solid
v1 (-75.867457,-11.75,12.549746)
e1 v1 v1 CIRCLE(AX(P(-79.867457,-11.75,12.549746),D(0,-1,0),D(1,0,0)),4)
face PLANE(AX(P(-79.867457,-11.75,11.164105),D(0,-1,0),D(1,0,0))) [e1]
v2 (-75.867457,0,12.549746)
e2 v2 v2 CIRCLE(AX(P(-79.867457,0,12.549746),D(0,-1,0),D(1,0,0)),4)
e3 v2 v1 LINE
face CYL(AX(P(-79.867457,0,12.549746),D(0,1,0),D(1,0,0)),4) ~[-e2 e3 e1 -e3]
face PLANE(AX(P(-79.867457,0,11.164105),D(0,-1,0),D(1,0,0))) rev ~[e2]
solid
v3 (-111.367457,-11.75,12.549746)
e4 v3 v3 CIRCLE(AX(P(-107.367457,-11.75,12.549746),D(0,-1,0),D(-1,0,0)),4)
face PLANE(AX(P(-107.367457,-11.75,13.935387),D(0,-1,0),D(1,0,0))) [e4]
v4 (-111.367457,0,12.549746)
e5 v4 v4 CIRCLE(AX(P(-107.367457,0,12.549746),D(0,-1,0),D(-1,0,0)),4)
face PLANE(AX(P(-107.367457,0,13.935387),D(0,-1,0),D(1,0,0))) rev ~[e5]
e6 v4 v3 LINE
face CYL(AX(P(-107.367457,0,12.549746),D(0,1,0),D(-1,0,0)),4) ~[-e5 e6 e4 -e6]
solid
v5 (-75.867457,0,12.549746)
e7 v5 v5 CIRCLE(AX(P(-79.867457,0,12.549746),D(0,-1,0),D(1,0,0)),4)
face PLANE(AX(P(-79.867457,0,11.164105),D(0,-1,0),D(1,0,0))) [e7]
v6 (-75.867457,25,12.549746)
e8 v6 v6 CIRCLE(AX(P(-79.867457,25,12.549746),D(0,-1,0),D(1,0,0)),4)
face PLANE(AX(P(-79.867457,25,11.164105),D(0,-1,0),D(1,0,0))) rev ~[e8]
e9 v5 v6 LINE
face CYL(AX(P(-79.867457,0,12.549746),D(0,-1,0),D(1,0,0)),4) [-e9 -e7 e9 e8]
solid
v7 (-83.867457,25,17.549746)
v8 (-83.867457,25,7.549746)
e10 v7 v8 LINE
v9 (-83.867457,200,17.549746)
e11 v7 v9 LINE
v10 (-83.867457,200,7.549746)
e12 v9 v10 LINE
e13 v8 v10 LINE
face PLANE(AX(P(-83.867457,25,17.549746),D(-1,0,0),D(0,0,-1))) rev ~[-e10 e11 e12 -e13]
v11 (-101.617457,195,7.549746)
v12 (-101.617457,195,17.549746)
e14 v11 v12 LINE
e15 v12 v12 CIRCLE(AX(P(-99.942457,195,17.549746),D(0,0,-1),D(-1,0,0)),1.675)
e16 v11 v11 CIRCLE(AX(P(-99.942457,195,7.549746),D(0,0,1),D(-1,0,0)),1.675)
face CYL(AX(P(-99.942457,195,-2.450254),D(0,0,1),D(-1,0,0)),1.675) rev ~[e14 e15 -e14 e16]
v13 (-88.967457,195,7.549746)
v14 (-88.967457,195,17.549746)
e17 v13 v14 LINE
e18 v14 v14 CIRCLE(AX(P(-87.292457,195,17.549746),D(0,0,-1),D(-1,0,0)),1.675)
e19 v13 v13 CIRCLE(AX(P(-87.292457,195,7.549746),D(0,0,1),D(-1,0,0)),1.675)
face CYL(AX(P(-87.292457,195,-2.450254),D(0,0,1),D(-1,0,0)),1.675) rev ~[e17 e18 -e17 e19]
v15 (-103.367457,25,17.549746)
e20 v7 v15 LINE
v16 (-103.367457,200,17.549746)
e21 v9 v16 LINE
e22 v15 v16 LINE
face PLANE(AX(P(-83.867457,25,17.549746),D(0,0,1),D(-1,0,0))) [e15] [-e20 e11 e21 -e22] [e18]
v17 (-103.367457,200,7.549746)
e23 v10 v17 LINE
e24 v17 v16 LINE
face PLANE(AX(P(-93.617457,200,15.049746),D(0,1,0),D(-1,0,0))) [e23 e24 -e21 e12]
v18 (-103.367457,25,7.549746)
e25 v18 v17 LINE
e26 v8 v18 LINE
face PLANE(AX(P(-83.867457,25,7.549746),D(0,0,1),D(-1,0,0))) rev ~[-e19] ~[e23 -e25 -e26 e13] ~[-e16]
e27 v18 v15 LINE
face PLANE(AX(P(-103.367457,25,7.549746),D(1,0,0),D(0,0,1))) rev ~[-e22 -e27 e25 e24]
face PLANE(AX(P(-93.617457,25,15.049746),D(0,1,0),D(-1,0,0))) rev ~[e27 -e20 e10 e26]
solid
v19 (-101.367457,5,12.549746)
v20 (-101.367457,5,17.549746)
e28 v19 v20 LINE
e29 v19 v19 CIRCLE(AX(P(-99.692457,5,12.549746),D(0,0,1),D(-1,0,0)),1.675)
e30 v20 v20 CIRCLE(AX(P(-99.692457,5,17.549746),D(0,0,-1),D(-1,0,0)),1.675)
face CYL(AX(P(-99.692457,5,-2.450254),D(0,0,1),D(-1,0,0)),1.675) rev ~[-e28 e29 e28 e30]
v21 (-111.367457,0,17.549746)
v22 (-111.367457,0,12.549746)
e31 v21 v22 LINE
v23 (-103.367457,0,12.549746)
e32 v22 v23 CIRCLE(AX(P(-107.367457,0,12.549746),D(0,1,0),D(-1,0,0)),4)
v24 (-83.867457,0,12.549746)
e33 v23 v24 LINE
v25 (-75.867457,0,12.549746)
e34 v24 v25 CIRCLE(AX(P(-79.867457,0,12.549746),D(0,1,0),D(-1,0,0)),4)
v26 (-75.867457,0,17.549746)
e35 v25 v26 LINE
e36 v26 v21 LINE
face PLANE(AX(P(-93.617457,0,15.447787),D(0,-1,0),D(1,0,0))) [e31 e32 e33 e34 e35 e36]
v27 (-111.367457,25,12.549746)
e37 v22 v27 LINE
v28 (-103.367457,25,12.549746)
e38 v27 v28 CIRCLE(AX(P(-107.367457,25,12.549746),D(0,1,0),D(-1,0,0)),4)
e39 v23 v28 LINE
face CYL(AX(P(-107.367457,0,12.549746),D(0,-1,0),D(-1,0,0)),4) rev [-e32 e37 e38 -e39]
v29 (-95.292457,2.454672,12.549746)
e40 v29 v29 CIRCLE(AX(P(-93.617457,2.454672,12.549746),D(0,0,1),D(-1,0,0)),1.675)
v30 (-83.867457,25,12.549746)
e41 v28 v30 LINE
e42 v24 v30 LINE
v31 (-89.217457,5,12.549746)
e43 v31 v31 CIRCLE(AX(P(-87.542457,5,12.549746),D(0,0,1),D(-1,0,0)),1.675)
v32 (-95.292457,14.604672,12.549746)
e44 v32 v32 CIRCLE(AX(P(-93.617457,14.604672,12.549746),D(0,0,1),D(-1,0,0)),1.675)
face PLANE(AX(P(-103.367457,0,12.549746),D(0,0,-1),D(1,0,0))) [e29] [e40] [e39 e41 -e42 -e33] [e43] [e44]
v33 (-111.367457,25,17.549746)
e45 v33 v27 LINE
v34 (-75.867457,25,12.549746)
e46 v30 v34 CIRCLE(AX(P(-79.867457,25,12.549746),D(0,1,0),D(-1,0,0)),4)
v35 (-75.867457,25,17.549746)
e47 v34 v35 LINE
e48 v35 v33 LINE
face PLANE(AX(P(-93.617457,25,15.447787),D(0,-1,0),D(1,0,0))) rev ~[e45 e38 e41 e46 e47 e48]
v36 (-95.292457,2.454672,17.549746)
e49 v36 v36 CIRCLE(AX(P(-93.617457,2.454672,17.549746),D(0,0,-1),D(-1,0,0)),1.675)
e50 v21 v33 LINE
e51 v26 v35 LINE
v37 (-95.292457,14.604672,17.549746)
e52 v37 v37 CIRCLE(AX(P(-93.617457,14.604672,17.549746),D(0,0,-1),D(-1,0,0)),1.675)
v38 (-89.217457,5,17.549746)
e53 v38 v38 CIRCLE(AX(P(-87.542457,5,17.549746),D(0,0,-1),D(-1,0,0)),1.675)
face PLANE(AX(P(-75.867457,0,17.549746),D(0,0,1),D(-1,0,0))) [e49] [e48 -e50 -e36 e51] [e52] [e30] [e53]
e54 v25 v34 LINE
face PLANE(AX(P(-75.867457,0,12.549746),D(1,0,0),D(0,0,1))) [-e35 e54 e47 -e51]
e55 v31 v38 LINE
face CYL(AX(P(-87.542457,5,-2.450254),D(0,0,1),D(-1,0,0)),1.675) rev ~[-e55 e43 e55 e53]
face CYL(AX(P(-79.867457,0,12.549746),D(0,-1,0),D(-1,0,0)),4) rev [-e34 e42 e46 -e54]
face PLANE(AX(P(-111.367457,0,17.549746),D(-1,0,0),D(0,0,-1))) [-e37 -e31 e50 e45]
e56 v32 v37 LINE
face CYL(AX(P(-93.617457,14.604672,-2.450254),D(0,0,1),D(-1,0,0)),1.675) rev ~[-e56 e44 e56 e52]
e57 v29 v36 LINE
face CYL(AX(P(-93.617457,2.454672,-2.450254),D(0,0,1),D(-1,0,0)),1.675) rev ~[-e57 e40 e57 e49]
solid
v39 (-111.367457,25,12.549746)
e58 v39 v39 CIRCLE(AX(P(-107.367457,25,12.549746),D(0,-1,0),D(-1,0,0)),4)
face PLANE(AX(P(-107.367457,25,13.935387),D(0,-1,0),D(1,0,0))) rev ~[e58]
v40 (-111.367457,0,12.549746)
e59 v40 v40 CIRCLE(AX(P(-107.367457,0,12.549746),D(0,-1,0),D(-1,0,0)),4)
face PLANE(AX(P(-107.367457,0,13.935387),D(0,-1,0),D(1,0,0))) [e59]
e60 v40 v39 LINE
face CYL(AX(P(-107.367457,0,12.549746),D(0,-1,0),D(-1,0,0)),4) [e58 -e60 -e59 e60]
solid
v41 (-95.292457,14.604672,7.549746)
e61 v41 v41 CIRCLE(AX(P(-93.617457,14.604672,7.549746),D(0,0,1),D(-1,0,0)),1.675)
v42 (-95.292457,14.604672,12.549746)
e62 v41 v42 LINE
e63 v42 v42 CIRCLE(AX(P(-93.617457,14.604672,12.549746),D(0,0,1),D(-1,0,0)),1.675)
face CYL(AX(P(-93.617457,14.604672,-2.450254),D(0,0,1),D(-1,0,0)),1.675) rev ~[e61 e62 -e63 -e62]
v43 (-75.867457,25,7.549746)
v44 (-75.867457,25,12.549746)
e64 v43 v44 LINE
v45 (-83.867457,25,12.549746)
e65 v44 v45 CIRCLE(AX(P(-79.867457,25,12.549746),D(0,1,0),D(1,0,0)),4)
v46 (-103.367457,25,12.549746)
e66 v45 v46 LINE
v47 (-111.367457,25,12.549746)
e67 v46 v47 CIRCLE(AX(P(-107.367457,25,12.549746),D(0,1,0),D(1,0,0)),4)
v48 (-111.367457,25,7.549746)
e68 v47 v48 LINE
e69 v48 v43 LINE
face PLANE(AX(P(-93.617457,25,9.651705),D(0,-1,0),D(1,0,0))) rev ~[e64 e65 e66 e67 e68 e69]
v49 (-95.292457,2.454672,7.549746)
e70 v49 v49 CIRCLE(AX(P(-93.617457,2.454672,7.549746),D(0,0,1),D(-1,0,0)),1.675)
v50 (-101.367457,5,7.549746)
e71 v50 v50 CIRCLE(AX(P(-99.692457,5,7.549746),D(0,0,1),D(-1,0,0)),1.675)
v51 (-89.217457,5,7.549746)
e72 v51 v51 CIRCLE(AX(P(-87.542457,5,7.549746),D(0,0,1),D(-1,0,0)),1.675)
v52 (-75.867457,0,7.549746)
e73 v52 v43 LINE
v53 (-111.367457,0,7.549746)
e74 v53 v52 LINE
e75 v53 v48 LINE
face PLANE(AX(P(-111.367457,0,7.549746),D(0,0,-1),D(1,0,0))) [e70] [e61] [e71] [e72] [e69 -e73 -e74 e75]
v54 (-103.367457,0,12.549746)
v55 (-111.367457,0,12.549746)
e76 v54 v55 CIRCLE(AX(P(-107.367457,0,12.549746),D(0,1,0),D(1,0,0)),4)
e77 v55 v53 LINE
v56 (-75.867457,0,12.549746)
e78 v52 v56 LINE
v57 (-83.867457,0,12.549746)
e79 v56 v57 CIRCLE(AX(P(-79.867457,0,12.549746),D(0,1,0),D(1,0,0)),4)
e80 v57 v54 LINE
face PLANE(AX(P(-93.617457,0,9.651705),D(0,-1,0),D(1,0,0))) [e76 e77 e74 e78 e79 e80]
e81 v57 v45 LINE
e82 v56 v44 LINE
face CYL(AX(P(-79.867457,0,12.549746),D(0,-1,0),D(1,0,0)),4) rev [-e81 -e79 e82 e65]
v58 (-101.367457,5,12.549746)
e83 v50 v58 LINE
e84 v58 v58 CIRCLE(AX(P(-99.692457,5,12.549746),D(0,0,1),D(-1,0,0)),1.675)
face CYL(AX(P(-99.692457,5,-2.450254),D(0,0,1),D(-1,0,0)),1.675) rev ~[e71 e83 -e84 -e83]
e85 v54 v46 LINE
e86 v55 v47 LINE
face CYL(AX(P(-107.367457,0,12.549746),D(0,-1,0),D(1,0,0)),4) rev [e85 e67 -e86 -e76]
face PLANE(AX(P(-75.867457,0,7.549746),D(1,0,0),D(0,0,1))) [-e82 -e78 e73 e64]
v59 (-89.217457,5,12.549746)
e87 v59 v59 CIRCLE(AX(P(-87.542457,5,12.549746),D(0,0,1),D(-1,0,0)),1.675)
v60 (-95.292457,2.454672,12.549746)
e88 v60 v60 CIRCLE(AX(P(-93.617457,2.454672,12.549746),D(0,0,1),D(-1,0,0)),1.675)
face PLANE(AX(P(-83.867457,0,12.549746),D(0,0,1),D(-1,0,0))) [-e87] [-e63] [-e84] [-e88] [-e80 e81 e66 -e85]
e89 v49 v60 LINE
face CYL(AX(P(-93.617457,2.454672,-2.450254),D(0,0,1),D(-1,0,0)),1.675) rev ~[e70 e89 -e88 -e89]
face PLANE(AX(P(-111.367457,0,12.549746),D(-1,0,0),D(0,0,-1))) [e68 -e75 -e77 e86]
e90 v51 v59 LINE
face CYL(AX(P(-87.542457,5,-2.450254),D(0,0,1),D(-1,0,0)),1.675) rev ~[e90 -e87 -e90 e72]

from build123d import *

# Parameters (mm, degrees)
F1_DEPTH   = 11.75
F2_DEPTH   = 25
F3_DEPTH   = 25
F4_DEPTH   = 25
F5_W       = 19.5
F5_H       = 5
F6_DEPTH   = 175
F8_D       = 3.35
F8_DEPTH   = 10
F8_TIP     = 1.0064415369
F8_2_D     = 3.35
F8_2_DEPTH = 10
F8_2_TIP   = 1.0064415369
F8_3_D     = 3.35
F8_3_DEPTH = 10
F8_3_TIP   = 1.0064415369


with BuildPart() as f1:
    # F0 (on Front) → F1 (new body)
    with BuildSketch(Plane.XZ):
        with BuildLine():
            ThreePointArc((-83.867456615, 12.549745962), (-79.867456615, 8.549745962), (-75.867456615, 12.549745962))
            Line((-75.867456615, 12.549745962), (-79.867456615, 12.549745962))
            Line((-79.867456615, 12.549745962), (-83.867456615, 12.549745962))
        make_face()
        with BuildLine():
            Line((-79.867456615, 12.549745962), (-75.867456615, 12.549745962))
            ThreePointArc((-75.867456615, 12.549745962), (-79.867456615, 16.549745962), (-83.867456615, 12.549745962))
            Line((-83.867456615, 12.549745962), (-79.867456615, 12.549745962))
        make_face()
    extrude(amount=F1_DEPTH)


with BuildPart() as f1b:
    # F0 (on Front) → F1, piece 2 (new body)
    with BuildSketch(Plane.XZ):
        with BuildLine():
            ThreePointArc((-103.367456615, 12.549745962), (-107.367456615, 16.549745962), (-111.367456615, 12.549745962))
            Line((-111.367456615, 12.549745962), (-107.367456615, 12.549745962))
            Line((-107.367456615, 12.549745962), (-103.367456615, 12.549745962))
        make_face()
        with BuildLine():
            Line((-107.367456615, 12.549745962), (-111.367456615, 12.549745962))
            ThreePointArc((-111.367456615, 12.549745962), (-107.367456615, 8.549745962), (-103.367456615, 12.549745962))
            Line((-103.367456615, 12.549745962), (-107.367456615, 12.549745962))
        make_face()
    extrude(amount=F1_DEPTH)


with BuildPart() as f2:
    # F0 (on Front) → F2 (new body)
    with BuildSketch(Plane.XZ):
        with BuildLine():
            Line((-75.867456615, 7.549745962), (-75.867456615, 12.549745962))
            ThreePointArc((-75.867456615, 12.549745962), (-79.867456615, 8.549745962), (-83.867456615, 12.549745962))
            Line((-83.867456615, 12.549745962), (-103.367456615, 12.549745962))
            ThreePointArc((-103.367456615, 12.549745962), (-107.367456615, 8.549745962), (-111.367456615, 12.549745962))
            Line((-111.367456615, 12.549745962), (-111.367456615, 7.549745962))
            Line((-111.367456615, 7.549745962), (-75.867456615, 7.549745962))
        make_face()
    extrude(amount=-F2_DEPTH)

    # F8
    with Locations(Plane(origin=(0, 0, 7.549745962), x_dir=(1, 0, 0), z_dir=(0, 0, -1))):
        with Locations((-99.692456615, -5), (-87.542456615, -5), (-99.942456615, -195), (-87.292456615, -195), (-93.617456615, -14.6046723992), (-93.617456615, -2.4546723992)):
            Hole(F8_D / 2, depth=F8_DEPTH)
            with Locations((0, 0, -(F8_DEPTH + F8_TIP / 2))):  # 118° drill point
                Cone(0, F8_D / 2, F8_TIP, mode=Mode.SUBTRACT)


with BuildPart() as f3:
    # F0 (on Front) → F3 (new body)
    with BuildSketch(Plane.XZ):
        with BuildLine():
            Line((-75.867456615, 12.549745962), (-75.867456615, 17.549745962))
            Line((-75.867456615, 17.549745962), (-111.367456615, 17.549745962))
            Line((-111.367456615, 17.549745962), (-111.367456615, 12.549745962))
            ThreePointArc((-111.367456615, 12.549745962), (-107.367456615, 16.549745962), (-103.367456615, 12.549745962))
            Line((-103.367456615, 12.549745962), (-83.867456615, 12.549745962))
            ThreePointArc((-83.867456615, 12.549745962), (-79.867456615, 16.549745962), (-75.867456615, 12.549745962))
        make_face()
    extrude(amount=-F3_DEPTH)

    # F8#2
    with Locations(Plane(origin=(0, 0, 7.549745962), x_dir=(1, 0, 0), z_dir=(0, 0, -1))):
        with Locations((-99.692456615, -5), (-87.542456615, -5), (-99.942456615, -195), (-87.292456615, -195), (-93.617456615, -14.6046723992), (-93.617456615, -2.4546723992)):
            Hole(F8_2_D / 2, depth=F8_2_DEPTH)
            with Locations((0, 0, -(F8_2_DEPTH + F8_2_TIP / 2))):  # 118° drill point
                Cone(0, F8_2_D / 2, F8_2_TIP, mode=Mode.SUBTRACT)


with BuildPart() as f4:
    # F0 (on Front) → F4 (new body)
    with BuildSketch(Plane.XZ):
        with BuildLine():
            ThreePointArc((-83.867456615, 12.549745962), (-79.867456615, 8.549745962), (-75.867456615, 12.549745962))
            Line((-75.867456615, 12.549745962), (-79.867456615, 12.549745962))
            Line((-79.867456615, 12.549745962), (-83.867456615, 12.549745962))
        make_face()
        with BuildLine():
            Line((-79.867456615, 12.549745962), (-75.867456615, 12.549745962))
            ThreePointArc((-75.867456615, 12.549745962), (-79.867456615, 16.549745962), (-83.867456615, 12.549745962))
            Line((-83.867456615, 12.549745962), (-79.867456615, 12.549745962))
        make_face()
    extrude(amount=-F4_DEPTH)


with BuildPart() as f4b:
    # F0 (on Front) → F4, piece 2 (new body)
    with BuildSketch(Plane.XZ):
        with BuildLine():
            ThreePointArc((-103.367456615, 12.549745962), (-107.367456615, 16.549745962), (-111.367456615, 12.549745962))
            Line((-111.367456615, 12.549745962), (-107.367456615, 12.549745962))
            Line((-107.367456615, 12.549745962), (-103.367456615, 12.549745962))
        make_face()
        with BuildLine():
            Line((-107.367456615, 12.549745962), (-111.367456615, 12.549745962))
            ThreePointArc((-111.367456615, 12.549745962), (-107.367456615, 8.549745962), (-103.367456615, 12.549745962))
            Line((-103.367456615, 12.549745962), (-107.367456615, 12.549745962))
        make_face()
    extrude(amount=-F4_DEPTH)


with BuildPart() as f6:
    # F5 (on face) → F6 (new body)
    with BuildSketch(Plane(origin=(0, 25, 0), x_dir=(-1, 0, 0), z_dir=(0, 1, 0))):
        with Locations((93.617456615, 15.049745962)):
            Rectangle(F5_W, F5_H)
        Polygon((100.994568646, 7.549745962), (103.367456615, 7.549745962), (103.367456615, 12.549745962), (83.867456615, 12.549745962), (83.867456615, 7.549745962), align=None)
    extrude(amount=F6_DEPTH)

    # F8#3
    with Locations(Plane(origin=(0, 0, 7.549745962), x_dir=(1, 0, 0), z_dir=(0, 0, -1))):
        with Locations((-99.692456615, -5), (-87.542456615, -5), (-99.942456615, -195), (-87.292456615, -195), (-93.617456615, -14.6046723992), (-93.617456615, -2.4546723992)):
            Hole(F8_3_D / 2, depth=F8_3_DEPTH)
            with Locations((0, 0, -(F8_3_DEPTH + F8_3_TIP / 2))):  # 118° drill point
                Cone(0, F8_3_D / 2, F8_3_TIP, mode=Mode.SUBTRACT)


solid = Compound([f1.part, f1b.part, f2.part, f3.part, f4.part, f4b.part, f6.part])
